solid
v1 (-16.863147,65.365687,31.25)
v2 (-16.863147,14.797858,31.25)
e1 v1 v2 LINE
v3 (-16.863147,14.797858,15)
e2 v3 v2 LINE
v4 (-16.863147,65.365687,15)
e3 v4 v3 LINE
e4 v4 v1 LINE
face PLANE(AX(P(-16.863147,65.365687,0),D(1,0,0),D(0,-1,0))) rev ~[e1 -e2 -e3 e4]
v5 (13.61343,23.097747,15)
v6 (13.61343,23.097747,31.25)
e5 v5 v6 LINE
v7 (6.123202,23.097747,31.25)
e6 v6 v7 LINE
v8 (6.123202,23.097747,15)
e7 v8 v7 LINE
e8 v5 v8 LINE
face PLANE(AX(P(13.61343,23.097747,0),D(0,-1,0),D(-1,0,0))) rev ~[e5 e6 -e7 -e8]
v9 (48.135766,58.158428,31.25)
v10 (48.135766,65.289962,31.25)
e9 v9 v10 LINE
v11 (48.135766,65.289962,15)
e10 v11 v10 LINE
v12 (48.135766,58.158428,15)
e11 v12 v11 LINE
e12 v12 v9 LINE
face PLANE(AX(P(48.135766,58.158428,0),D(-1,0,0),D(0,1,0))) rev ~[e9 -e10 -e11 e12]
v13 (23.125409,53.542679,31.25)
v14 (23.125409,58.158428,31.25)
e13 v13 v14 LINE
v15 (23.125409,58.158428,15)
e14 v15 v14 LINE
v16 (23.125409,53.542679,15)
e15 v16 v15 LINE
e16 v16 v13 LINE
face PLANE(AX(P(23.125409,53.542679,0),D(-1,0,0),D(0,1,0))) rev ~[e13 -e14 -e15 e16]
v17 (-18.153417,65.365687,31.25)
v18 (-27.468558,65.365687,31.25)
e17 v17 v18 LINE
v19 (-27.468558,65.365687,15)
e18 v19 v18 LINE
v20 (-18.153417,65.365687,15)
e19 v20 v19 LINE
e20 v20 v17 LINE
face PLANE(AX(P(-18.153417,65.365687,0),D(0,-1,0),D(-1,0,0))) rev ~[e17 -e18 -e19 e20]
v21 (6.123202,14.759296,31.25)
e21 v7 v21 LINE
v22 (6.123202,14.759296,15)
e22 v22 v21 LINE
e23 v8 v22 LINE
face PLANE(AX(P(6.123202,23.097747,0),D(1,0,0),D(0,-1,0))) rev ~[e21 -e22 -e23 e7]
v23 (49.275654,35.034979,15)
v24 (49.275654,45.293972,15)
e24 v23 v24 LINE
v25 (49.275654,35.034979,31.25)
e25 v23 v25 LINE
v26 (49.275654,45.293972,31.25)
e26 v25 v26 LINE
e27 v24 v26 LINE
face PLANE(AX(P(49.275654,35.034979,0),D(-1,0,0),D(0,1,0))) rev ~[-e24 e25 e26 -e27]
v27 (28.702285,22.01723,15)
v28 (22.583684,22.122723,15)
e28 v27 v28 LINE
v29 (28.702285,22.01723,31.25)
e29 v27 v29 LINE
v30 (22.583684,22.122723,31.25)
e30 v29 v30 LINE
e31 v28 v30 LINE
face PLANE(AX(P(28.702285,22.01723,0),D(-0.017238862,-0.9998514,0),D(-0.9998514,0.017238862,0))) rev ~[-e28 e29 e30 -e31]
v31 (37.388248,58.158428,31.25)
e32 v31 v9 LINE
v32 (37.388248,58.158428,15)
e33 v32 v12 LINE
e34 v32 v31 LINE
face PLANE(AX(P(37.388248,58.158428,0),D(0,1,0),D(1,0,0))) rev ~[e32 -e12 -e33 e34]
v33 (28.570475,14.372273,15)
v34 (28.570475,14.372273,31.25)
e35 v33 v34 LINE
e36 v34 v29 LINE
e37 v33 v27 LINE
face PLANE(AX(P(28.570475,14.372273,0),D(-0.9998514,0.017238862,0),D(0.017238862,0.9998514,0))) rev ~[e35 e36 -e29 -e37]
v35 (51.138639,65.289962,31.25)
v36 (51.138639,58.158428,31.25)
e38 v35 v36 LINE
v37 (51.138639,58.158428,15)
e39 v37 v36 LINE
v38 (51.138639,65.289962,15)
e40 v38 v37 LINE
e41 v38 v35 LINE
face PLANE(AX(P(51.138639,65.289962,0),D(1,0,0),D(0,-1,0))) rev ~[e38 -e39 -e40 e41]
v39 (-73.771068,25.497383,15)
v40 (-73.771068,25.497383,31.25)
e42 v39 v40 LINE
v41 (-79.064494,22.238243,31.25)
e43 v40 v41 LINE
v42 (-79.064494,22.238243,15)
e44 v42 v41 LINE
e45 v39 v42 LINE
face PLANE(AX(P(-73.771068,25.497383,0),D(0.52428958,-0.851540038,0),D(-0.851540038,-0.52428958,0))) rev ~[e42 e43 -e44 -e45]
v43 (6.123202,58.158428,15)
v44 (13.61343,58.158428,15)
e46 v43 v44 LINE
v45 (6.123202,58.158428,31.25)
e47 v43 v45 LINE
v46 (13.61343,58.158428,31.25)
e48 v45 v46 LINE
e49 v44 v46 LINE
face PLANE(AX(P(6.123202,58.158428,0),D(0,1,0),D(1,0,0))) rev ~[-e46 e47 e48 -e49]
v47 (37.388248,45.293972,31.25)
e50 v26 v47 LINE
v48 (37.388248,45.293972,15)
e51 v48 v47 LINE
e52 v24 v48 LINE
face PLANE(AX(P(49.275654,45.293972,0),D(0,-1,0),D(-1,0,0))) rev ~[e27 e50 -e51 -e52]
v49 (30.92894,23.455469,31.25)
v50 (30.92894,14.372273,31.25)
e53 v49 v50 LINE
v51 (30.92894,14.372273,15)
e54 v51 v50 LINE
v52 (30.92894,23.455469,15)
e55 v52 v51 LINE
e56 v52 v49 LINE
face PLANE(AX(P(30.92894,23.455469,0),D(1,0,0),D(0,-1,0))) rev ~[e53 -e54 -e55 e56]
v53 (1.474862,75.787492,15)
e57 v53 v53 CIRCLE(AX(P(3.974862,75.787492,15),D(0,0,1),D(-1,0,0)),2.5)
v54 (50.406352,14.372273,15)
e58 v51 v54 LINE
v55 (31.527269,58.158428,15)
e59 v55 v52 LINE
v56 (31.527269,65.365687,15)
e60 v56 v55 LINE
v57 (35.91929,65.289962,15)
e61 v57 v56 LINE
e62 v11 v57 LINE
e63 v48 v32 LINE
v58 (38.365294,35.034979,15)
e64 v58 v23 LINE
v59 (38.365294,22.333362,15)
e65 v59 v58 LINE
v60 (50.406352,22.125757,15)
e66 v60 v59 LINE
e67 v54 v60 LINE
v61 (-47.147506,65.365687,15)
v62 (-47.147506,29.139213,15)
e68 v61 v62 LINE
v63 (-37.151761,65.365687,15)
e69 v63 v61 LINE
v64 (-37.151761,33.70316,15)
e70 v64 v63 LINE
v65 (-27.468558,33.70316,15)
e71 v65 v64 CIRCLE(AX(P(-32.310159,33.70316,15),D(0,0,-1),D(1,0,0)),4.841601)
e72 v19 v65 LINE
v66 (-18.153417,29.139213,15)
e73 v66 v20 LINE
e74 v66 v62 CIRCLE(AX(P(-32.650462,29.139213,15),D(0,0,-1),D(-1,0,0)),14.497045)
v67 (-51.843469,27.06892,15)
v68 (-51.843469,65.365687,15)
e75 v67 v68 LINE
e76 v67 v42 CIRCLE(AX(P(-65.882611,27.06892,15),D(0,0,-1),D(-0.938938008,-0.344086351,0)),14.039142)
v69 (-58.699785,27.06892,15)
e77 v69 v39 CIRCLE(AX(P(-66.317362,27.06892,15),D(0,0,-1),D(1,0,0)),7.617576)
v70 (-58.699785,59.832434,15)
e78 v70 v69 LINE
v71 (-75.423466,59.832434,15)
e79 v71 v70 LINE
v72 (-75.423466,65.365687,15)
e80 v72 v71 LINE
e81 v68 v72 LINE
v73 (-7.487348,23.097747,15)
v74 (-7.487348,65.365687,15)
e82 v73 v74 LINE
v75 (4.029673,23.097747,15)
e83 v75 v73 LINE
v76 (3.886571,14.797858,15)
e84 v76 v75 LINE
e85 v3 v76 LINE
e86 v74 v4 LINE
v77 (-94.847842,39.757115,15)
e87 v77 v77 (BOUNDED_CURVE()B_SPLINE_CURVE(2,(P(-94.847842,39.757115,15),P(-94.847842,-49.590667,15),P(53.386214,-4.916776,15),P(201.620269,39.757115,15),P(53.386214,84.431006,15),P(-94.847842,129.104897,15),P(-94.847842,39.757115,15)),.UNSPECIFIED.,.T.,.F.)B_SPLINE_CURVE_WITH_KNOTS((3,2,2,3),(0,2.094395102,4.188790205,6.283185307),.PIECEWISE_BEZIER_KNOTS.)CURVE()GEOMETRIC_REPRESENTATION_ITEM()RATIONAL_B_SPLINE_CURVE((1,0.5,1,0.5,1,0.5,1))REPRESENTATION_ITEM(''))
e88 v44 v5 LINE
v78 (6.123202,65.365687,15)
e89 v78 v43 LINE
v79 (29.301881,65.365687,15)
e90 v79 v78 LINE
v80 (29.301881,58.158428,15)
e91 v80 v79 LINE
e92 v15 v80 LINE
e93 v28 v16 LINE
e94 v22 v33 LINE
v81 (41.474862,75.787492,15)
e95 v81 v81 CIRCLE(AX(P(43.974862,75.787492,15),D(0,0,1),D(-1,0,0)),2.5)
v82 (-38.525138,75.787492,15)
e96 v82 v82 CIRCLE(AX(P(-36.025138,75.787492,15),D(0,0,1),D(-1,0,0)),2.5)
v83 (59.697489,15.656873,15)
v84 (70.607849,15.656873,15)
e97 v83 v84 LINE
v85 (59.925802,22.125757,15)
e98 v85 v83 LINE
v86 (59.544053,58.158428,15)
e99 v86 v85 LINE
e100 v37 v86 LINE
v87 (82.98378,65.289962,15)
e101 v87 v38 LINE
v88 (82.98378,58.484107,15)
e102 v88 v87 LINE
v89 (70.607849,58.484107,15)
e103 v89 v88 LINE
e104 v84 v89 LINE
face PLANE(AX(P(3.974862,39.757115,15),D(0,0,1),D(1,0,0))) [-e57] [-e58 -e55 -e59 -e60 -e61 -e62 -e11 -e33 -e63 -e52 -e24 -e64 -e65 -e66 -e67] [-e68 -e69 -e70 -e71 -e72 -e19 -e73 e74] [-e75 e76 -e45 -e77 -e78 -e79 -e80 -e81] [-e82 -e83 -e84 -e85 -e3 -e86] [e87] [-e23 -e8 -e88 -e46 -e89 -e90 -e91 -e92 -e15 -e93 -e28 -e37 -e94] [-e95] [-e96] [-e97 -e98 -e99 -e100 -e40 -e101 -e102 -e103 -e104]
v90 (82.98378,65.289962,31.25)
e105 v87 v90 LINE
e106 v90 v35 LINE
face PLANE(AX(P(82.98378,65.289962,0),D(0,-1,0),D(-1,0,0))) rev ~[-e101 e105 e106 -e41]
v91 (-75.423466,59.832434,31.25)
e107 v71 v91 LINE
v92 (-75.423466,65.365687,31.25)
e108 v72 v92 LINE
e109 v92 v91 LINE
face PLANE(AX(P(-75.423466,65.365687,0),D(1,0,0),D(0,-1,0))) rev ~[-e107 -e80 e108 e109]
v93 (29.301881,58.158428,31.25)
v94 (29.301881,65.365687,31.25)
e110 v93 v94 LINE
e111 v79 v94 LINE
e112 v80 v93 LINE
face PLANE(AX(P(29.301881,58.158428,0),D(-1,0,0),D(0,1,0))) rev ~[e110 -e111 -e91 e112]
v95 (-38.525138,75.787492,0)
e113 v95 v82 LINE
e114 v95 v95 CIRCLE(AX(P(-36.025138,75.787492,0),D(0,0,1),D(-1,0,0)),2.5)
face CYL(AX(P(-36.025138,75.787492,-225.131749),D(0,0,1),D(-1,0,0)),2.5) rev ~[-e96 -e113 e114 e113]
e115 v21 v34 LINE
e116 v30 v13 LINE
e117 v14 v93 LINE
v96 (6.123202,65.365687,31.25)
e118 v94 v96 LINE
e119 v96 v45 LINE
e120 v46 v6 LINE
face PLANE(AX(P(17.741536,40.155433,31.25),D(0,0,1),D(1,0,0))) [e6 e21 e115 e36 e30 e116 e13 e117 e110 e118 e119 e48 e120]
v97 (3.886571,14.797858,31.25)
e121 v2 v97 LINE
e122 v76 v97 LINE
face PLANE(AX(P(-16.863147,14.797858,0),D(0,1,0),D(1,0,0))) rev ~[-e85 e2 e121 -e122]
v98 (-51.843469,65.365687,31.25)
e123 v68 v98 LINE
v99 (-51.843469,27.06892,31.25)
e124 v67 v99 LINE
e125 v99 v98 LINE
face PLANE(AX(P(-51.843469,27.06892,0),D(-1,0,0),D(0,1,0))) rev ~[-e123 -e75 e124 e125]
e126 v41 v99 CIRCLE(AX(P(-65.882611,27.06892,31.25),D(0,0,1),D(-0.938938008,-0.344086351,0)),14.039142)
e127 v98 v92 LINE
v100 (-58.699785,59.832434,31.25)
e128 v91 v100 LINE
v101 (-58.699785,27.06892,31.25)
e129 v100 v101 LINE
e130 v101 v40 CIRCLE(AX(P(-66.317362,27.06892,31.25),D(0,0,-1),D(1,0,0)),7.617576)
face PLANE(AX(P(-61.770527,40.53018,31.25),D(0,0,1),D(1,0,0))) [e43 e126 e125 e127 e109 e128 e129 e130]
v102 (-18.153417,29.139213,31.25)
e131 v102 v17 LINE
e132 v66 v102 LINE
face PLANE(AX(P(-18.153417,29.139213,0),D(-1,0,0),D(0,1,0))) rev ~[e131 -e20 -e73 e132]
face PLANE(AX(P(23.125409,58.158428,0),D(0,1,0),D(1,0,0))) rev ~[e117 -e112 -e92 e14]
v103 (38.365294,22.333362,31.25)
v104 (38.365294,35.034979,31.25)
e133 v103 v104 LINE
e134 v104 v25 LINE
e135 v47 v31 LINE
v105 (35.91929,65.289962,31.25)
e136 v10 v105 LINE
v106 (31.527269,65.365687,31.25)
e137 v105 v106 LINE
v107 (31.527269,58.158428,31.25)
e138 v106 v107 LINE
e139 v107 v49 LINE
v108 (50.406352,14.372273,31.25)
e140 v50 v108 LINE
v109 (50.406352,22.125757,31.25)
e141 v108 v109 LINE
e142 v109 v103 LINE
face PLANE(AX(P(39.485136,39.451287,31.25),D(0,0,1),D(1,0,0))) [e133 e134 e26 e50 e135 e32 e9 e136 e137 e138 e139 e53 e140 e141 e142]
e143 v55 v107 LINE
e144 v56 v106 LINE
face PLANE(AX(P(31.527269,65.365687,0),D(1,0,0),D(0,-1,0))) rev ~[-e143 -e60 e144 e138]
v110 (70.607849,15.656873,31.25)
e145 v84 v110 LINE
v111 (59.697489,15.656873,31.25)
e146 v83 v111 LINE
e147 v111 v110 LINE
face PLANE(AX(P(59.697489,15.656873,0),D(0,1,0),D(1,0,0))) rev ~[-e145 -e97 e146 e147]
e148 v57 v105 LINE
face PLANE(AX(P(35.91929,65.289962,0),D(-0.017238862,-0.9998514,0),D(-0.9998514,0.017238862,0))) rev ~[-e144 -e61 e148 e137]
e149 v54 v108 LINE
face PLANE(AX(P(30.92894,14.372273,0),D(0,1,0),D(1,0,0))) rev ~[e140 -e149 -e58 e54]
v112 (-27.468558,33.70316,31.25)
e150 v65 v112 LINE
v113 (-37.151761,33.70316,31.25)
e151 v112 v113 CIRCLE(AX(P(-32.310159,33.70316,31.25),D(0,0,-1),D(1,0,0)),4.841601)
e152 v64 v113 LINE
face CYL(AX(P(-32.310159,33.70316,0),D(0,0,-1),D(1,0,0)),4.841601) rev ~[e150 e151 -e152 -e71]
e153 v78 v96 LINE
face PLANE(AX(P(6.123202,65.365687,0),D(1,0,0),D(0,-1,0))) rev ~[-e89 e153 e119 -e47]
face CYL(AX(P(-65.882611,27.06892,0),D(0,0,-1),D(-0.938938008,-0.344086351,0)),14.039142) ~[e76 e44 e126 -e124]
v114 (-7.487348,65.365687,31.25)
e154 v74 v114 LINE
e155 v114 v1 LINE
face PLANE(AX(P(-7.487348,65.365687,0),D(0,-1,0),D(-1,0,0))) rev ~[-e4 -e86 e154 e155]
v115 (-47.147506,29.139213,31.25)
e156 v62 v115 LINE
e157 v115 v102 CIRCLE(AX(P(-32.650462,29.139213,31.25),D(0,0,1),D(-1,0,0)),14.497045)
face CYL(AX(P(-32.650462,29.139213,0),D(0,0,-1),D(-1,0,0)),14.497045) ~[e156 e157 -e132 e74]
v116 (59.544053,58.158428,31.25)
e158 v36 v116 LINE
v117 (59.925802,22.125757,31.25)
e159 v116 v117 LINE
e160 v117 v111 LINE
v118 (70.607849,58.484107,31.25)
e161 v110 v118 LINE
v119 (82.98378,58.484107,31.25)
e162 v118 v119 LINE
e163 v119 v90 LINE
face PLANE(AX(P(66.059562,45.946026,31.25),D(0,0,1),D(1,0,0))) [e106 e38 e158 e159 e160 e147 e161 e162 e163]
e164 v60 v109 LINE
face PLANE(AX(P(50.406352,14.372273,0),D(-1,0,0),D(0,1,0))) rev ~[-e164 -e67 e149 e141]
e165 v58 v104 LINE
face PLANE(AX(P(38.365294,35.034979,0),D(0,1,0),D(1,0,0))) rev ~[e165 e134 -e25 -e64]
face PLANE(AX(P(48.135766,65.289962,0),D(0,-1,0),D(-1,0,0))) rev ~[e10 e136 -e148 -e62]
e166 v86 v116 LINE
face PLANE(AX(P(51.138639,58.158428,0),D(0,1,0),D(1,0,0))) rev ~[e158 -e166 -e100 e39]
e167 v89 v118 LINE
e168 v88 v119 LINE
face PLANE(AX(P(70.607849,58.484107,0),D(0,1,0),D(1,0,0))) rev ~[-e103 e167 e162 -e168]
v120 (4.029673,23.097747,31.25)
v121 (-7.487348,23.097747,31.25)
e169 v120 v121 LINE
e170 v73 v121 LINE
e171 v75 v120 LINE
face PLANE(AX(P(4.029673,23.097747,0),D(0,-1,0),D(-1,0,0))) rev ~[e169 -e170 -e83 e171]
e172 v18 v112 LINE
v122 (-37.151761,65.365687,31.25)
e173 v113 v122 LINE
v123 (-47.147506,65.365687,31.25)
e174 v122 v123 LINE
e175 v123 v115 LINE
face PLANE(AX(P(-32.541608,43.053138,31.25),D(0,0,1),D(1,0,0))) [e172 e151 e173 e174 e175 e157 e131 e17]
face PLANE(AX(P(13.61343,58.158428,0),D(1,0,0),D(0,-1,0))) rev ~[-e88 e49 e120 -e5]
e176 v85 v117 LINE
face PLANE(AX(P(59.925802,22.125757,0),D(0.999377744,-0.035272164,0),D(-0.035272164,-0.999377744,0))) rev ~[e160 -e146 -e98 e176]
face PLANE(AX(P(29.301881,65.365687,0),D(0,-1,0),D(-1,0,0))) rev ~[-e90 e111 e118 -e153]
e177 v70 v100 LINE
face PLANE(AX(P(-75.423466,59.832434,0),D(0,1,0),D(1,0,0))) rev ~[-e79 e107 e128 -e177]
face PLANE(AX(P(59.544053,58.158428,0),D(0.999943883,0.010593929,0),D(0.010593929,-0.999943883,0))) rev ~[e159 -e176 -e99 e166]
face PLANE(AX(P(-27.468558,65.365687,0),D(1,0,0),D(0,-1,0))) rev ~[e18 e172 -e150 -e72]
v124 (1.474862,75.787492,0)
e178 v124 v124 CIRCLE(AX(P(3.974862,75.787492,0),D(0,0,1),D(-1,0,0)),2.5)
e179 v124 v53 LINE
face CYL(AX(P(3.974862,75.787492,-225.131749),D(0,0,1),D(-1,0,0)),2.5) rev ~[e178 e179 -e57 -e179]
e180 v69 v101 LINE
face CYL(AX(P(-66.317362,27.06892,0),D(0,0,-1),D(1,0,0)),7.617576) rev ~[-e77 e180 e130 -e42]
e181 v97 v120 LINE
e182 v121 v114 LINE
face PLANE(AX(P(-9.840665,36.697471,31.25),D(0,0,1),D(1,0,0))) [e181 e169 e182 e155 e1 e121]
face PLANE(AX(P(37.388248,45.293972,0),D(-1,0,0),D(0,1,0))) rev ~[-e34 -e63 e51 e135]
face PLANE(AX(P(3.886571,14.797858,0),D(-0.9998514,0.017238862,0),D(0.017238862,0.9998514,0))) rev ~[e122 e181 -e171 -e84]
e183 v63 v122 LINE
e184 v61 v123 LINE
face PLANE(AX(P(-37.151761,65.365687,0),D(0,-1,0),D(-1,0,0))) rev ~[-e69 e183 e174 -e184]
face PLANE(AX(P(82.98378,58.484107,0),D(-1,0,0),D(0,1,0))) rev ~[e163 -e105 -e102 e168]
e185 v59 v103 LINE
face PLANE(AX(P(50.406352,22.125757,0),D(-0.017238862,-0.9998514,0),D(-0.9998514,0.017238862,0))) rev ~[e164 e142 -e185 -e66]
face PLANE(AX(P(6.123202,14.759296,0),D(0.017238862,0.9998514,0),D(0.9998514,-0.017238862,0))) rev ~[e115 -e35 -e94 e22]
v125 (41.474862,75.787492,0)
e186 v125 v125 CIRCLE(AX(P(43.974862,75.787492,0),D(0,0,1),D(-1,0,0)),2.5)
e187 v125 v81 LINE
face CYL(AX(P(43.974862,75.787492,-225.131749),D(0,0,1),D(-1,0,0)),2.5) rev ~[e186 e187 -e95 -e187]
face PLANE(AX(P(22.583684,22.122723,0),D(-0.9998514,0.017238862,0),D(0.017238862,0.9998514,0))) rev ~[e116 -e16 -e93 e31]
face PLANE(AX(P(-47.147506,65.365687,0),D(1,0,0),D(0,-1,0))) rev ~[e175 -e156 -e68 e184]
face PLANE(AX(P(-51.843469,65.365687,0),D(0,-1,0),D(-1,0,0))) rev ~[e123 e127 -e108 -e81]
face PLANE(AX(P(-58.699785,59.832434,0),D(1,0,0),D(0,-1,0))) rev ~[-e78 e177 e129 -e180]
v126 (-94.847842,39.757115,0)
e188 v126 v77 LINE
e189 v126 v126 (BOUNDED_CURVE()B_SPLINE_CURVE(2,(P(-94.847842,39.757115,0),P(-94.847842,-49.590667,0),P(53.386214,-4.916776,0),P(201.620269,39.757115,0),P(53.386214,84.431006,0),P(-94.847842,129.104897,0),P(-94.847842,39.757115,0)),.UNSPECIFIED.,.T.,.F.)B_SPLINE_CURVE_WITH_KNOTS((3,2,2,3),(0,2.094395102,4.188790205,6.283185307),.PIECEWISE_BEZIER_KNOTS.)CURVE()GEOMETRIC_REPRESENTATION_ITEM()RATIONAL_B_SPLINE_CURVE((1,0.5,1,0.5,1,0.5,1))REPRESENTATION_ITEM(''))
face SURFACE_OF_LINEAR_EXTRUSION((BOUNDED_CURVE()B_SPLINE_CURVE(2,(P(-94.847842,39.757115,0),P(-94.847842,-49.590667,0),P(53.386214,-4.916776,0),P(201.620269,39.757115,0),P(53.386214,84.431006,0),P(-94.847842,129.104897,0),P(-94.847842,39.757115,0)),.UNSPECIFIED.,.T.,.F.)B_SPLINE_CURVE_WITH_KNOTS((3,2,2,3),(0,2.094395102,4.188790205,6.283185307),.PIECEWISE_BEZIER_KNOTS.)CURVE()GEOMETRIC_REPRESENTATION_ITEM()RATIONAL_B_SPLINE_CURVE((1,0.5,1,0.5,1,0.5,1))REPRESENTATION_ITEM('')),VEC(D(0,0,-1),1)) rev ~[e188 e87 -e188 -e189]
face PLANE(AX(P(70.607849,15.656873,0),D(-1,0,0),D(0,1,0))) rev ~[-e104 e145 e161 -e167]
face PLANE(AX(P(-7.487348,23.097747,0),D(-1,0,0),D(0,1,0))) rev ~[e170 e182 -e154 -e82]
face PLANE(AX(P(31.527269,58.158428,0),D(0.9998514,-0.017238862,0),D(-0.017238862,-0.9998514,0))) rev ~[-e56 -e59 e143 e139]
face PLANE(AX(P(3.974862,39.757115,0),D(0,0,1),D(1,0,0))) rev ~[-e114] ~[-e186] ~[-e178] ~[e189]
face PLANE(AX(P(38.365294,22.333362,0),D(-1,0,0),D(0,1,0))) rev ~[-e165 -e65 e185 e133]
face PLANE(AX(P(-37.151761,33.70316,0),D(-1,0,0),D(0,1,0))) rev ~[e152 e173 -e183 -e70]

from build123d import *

# Parameters (mm, degrees)
F1_DEPTH = 25
F3_DEPTH = 12
F4_SCALE = 1.25
F6_D     = 5


with BuildPart() as f1:
    # F0 (on Top) → F1 (new body)
    with BuildSketch(Plane.XY):
        with BuildLine():
            Line((-13.2980933413, 65.3656870127), (-20.7502059639, 65.3656870127))
            Line((-20.7502059639, 65.3656870127), (-20.7502059639, 40.0356650352))
            ThreePointArc((-20.7502059639, 40.0356650352), (-24.6234871447, 36.1623838544), (-28.4967683256, 40.0356650352))
            Line((-28.4967683256, 40.0356650352), (-28.4967683256, 65.3656870127))
            Line((-28.4967683256, 65.3656870127), (-31.6937640309, 65.3656870127))
            Line((-31.6937640309, 65.3656870127), (-36.4933647215, 65.3656870127))
            Line((-36.4933647215, 65.3656870127), (-36.4933647215, 36.3845080137))
            ThreePointArc((-36.4933647215, 36.3845080137), (-24.8957290314, 24.7868723236), (-13.2980933413, 36.3845080137))
            Line((-13.2980933413, 36.3845080137), (-13.2980933413, 65.3656870127))
        make_face()
    extrude(amount=F1_DEPTH)



with BuildPart() as f1b:
    # F0 (on Top) → F1, piece 2 (new body)
    with BuildSketch(Plane.XY):
        Polygon((-4.7652381472, 65.3656870127), (-12.2658768669, 65.3656870127), (-12.2658768669, 30.3217209876), (-12.2658768669, 24.9114241451), (4.3338974938, 24.9114241451), (4.4483790145, 31.551335007), (-4.7652381472, 31.551335007), (-4.7652381472, 37.9453226924), (-4.7652381472, 61.2577274442), align=None)
    extrude(amount=F1_DEPTH)


with BuildPart() as f1c:
    # F0 (on Top) → F1, piece 3 (new body)
    with BuildSketch(Plane.XY):
        Polygon((67.6116645336, 65.3051072577), (42.1355515718, 65.3051072577), (42.1355515718, 59.5998801291), (48.8598830998, 59.5998801291), (49.1652822897, 30.7737427528), (48.9826314151, 25.598635897), (57.7109195292, 25.598635897), (57.7109195292, 59.8604232073), (67.6116645336, 59.8604232073), align=None)
    extrude(amount=F1_DEPTH)


with BuildPart() as f1d:
    # F0 (on Top) → F1, piece 4 (new body)
    with BuildSketch(Plane.XY):
        Polygon((29.9600720621, 65.3051072577), (26.4464554486, 65.3656870127), (26.4464554486, 59.5998801291), (25.9677926885, 31.8375125559), (25.9677926885, 30.6562086032), (25.9677926885, 25.2078175545), (25.9677926885, 24.5709556187), (41.5497215959, 24.5709556187), (41.5497215959, 24.9391629061), (41.5497215959, 30.7737427528), (31.9168753922, 30.9398267418), (31.9168753922, 41.1011204123), (40.6451635063, 41.1011204123), (40.6451635063, 49.3083149195), (31.1352387071, 49.3083149195), (31.1352387071, 59.5998801291), (39.7332534194, 59.5998801291), (39.7332534194, 64.1594305634), (39.7332534194, 65.3051072577), align=None)
    extrude(amount=F1_DEPTH)


with BuildPart() as f1e:
    # F0 (on Top) → F1, piece 5 (new body)
    with BuildSketch(Plane.XY):
        Polygon((24.081020448, 24.5709556187), (24.1864684053, 30.6869211711), (19.2915876022, 30.7713158881), (19.7249674405, 55.9072808625), (19.7249674405, 59.5998801291), (24.6661454439, 59.5998801291), (24.6661454439, 65.3656870127), (12.5062046573, 65.3656870127), (6.1232019216, 65.3656870127), (6.1232019216, 59.5998801291), (12.115384452, 59.5998801291), (12.115384452, 55.4311461747), (12.115384452, 31.551335007), (6.4647817053, 31.551335007), (6.1232019216, 31.551335007), (6.1232019216, 24.8805739882), align=None)
    extrude(amount=F1_DEPTH)


with BuildPart() as f1f:
    # F0 (on Top) → F1, piece 6 (new body)
    with BuildSketch(Plane.XY):
        with BuildLine():
            Line((-40.2501347491, 38.9378666878), (-40.2501347491, 65.3656870127))
            Line((-40.2501347491, 65.3656870127), (-59.1141320765, 65.3656870127))
            Line((-59.1141320765, 65.3656870127), (-59.1141320765, 60.9390847385))
            Line((-59.1141320765, 60.9390847385), (-45.7351878285, 60.9390847385))
            Line((-45.7351878285, 60.9390847385), (-45.7351878285, 40.1110313833))
            Line((-45.7351878285, 40.1110313833), (-45.7351878285, 37.0055958629))
            Line((-45.7351878285, 37.0055958629), (-45.7351878285, 34.7282737494))
            ThreePointArc((-45.7351878285, 34.7282737494), (-51.1972258986, 28.6670752331), (-57.7922141434, 33.471044153))
            Line((-57.7922141434, 33.471044153), (-62.0269551873, 30.8637320995))
            ThreePointArc((-62.0269551873, 30.8637320995), (-49.5189871635, 23.6697409515), (-40.2501347491, 34.7282737494))
            Line((-40.2501347491, 34.7282737494), (-40.2501347491, 37.0055958629))
            Line((-40.2501347491, 37.0055958629), (-40.2501347491, 38.9378666878))
        make_face()
    extrude(amount=F1_DEPTH)


with BuildPart() as f1_1:
    add(f1.part)

    add(f1b.part)  # F3 merges F1b

    add(f1c.part)  # F3 merges F1c

    add(f1d.part)  # F3 merges F1d

    add(f1e.part)  # F3 merges F1e

    add(f1f.part)  # F3 merges F1f
    # F2 (on Top) → F3 (join)
    with BuildSketch(Plane.XY):
        with BuildLine():
            add(Edge.make_bspline(
                [(-74.6536329389, 44.8788292706), (-74.6536329389, -26.5993963968), (43.9336113632, 9.1397164369), (162.5208556652, 44.8788292706), (43.9336113632, 80.6179421043), (-74.6536329389, 116.357054938), (-74.6536329389, 44.8788292706)],
                knots=[0, 0, 0, 2.0943951024, 2.0943951024, 4.1887902048, 4.1887902048, 6.2831853072, 6.2831853072, 6.2831853072], degree=2, weights=[1, 0.5, 1, 0.5, 1, 0.5, 1]))
        make_face()
    extrude(amount=F3_DEPTH)


with BuildPart() as f1_2:
    # F4: moved
    add(f1_1.part.scale(F4_SCALE).moved(Location((-1.5308004804, -16.3414217532, 0))))

    # F6 (through all)
    with Locations(Plane(origin=(0, 0, 0), x_dir=(1, 0, 0), z_dir=(0, 0, -1))):
        with Locations((-36.0251380689, -75.7874920964), (3.9748619311, -75.7874920964), (43.9748619311, -75.7874920964)):
            Hole(F6_D / 2)


solid = f1_2.part
